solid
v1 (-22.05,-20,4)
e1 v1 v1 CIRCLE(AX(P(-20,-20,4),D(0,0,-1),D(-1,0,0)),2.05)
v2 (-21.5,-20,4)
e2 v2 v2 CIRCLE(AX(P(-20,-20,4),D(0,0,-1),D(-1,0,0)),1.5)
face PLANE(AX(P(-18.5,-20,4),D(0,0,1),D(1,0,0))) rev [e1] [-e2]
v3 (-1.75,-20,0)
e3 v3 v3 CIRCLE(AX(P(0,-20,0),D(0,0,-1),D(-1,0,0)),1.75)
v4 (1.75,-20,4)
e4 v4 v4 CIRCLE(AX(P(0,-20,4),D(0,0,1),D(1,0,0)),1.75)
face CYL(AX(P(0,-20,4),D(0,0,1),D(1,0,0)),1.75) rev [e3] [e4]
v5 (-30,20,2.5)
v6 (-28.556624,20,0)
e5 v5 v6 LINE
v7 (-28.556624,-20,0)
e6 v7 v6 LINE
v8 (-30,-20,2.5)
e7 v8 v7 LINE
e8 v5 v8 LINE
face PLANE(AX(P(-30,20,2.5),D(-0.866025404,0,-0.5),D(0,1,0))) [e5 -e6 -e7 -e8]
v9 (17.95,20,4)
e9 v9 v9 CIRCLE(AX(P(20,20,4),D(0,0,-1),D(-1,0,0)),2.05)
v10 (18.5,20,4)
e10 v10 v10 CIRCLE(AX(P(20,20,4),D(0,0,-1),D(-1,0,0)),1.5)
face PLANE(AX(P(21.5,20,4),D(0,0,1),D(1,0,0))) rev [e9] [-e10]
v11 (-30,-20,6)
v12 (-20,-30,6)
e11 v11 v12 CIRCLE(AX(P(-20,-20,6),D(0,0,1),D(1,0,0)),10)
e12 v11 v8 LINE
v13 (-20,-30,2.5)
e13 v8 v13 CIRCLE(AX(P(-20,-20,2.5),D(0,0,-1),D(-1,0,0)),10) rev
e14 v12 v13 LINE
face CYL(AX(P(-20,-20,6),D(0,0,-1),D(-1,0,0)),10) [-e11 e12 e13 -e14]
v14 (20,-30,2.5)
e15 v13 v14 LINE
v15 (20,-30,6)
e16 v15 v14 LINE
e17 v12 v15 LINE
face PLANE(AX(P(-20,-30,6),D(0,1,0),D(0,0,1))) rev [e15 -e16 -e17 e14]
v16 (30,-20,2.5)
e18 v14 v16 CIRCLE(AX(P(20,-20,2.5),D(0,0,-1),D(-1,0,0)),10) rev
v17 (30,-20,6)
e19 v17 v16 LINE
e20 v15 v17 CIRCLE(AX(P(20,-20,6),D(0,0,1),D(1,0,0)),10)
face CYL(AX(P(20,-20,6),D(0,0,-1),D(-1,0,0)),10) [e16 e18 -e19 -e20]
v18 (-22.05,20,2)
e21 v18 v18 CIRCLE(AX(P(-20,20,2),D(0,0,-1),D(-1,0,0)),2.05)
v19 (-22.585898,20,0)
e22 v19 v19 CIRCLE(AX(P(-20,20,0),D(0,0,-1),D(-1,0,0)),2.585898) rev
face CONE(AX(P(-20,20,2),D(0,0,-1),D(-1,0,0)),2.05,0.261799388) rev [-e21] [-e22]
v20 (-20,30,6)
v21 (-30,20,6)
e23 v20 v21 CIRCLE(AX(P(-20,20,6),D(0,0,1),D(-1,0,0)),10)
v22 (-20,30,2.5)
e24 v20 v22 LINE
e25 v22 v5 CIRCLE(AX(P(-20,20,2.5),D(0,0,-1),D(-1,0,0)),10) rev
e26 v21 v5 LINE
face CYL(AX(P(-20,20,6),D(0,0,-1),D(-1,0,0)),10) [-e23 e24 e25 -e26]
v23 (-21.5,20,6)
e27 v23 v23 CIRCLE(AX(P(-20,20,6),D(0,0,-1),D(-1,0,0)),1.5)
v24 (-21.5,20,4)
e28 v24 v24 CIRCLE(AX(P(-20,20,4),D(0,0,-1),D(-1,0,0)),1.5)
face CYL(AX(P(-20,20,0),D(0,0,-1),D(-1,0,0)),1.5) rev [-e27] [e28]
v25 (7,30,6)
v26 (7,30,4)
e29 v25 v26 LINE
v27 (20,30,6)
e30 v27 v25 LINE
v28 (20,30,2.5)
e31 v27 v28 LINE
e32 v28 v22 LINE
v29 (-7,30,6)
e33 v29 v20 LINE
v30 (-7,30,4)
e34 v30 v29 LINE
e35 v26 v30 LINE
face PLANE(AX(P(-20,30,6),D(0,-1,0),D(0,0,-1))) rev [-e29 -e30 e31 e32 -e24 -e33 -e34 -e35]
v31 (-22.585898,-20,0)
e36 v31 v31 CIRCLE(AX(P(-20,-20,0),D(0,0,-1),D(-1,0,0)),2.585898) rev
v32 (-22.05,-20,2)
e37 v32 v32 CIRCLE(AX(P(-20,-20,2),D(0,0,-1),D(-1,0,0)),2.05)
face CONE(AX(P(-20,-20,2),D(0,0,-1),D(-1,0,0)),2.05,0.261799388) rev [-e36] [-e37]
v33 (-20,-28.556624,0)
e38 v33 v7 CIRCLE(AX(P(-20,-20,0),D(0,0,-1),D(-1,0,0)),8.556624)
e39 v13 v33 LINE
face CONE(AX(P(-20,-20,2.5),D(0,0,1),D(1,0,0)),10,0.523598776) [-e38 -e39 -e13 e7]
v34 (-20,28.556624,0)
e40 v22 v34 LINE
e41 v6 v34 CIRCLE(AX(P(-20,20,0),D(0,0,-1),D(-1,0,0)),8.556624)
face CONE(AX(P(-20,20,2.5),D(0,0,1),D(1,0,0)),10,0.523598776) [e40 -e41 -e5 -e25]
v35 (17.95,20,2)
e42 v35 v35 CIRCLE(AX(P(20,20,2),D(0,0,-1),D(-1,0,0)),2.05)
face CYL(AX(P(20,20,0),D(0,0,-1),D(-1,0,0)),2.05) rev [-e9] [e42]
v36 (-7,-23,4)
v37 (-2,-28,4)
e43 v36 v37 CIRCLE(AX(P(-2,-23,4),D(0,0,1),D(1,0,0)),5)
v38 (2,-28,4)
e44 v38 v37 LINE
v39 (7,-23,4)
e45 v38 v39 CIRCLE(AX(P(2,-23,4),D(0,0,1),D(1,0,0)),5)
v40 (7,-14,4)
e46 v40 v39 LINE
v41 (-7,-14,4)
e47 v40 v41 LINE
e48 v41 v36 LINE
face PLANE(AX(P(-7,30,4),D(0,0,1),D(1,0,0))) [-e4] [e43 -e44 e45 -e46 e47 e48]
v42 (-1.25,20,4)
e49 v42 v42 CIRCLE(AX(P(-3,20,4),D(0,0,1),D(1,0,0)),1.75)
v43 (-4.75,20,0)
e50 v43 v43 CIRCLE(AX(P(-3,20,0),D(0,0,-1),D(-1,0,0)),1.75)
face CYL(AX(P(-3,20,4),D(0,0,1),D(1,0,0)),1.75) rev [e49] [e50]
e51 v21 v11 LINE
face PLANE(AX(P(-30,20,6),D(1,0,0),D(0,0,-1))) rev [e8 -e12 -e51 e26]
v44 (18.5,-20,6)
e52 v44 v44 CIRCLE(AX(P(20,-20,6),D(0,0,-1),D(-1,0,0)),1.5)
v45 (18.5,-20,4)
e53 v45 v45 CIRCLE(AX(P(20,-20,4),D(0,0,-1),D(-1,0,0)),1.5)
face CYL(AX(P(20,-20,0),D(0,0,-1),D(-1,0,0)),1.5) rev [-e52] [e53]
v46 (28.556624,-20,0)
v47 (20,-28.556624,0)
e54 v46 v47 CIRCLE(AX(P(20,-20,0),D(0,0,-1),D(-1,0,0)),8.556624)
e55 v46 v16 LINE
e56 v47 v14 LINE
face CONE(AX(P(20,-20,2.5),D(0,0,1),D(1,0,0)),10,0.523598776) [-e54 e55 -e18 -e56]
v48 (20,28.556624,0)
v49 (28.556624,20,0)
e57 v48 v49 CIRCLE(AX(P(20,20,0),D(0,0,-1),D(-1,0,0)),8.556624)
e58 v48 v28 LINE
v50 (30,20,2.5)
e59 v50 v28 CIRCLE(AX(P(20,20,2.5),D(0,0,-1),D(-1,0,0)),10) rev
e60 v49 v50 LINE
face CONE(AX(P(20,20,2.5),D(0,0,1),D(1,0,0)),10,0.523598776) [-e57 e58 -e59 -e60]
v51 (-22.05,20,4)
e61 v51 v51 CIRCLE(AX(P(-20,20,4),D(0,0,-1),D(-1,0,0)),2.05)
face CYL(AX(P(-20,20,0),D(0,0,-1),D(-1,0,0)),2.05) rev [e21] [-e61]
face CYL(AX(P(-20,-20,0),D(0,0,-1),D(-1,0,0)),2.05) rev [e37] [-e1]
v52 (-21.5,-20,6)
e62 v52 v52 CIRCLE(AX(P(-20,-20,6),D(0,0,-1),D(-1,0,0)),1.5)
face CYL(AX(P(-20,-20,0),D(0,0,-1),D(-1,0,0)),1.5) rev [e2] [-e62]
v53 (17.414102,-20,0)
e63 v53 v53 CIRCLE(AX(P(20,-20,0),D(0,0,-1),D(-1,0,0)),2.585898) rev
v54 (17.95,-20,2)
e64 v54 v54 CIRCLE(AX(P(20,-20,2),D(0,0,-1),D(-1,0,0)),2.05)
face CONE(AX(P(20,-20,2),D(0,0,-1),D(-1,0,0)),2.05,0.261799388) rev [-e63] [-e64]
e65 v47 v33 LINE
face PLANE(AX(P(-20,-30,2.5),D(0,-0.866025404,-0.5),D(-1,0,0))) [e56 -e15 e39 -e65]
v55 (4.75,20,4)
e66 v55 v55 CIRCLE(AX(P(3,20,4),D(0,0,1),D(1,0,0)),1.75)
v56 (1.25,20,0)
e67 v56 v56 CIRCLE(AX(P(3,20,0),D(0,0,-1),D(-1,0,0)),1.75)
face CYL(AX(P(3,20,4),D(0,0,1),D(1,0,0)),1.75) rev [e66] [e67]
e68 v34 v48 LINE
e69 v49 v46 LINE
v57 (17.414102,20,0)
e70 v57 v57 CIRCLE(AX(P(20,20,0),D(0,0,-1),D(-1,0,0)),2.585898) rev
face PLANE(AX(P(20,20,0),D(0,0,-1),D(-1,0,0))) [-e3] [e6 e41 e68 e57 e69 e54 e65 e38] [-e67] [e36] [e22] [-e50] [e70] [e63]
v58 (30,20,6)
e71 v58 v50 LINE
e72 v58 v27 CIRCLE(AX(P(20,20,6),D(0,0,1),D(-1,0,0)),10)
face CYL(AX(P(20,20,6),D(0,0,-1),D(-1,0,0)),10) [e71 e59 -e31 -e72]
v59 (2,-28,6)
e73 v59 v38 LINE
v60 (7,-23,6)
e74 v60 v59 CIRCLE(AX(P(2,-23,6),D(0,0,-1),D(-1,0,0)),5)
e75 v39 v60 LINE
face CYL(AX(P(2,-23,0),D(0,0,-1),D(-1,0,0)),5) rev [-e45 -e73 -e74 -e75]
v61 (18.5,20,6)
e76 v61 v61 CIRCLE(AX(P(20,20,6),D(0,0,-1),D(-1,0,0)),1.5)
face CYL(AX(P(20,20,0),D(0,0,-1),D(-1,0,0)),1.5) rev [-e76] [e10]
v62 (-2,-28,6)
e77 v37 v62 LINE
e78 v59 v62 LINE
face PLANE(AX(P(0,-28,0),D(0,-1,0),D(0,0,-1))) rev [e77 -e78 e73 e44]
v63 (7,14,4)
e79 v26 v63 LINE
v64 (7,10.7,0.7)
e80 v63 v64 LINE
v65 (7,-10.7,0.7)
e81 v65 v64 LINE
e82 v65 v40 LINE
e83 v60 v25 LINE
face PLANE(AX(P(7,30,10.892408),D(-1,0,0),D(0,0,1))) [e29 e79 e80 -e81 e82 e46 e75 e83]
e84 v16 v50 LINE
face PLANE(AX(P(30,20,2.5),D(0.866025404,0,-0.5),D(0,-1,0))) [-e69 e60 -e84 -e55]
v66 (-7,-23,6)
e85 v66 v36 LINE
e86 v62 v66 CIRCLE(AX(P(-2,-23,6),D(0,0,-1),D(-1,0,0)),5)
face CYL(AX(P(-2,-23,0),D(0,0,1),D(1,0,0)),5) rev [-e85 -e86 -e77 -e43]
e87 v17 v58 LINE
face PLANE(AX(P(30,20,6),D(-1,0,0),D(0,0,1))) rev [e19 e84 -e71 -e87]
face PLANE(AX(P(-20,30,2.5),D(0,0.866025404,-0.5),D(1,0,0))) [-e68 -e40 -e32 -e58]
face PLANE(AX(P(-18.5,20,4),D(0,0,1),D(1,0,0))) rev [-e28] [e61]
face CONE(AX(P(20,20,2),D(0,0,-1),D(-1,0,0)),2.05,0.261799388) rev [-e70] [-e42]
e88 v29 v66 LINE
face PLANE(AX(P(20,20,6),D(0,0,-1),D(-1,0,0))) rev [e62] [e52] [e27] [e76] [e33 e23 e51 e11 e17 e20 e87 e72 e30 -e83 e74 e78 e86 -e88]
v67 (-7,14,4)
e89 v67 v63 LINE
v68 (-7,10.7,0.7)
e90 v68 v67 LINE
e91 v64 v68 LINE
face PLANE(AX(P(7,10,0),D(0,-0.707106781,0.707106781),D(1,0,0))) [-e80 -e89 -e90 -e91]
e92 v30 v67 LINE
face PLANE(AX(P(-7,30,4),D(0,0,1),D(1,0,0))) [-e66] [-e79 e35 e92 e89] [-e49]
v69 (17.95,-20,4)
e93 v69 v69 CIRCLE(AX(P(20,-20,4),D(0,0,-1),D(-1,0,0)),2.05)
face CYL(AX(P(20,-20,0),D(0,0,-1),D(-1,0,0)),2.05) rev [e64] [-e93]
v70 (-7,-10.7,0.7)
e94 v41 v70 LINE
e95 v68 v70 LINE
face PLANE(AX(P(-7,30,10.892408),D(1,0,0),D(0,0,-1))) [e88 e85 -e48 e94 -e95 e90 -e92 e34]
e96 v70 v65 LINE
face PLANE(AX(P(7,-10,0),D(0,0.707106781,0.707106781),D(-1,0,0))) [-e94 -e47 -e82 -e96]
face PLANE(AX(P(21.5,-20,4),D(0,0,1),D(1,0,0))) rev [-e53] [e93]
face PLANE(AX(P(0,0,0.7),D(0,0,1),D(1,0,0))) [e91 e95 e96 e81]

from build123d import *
from OCP.BRepFilletAPI import BRepFilletAPI_MakeChamfer

# Parameters (mm, degrees)
BOSS_EXTRUDE1_DEPTH     = 6
CHAMFER1_SIZE           = 2.5
CHAMFER1_SIZE2          = 1.443375673
CUT_EXTRUDE1_DEPTH      = 43.848570571
CUT_EXTRUDE1_DEPTH_BACK = 28
SKETCH2_W               = 14
SKETCH2_H               = 6.892407629
SKETCH3_W               = 14
SKETCH3_H               = 20
CUT_EXTRUDE2_DEPTH      = 3.3
CHAMFER2_SIZE           = 4
HOLE1_D                 = 3
HOLE1_CBORE_D           = 4.1
HOLE1_CBORE_DEPTH       = 4
HOLE2_D                 = 3
HOLE2_CBORE_D           = 3.5
HOLE2_CBORE_DEPTH       = 20
FILLET2_R               = 5
CHAMFER3_SIZE           = 2
CHAMFER3_SIZE2          = 0.535898385


with BuildPart() as part:
    # Sketch1 → Boss-Extrude1 (new body)
    with BuildSketch(Plane.XY):
        with BuildLine():
            Line((-20, 30), (20, 30))
            ThreePointArc((20, 30), (27.071067812, 27.071067812), (30, 20))
            Line((30, 20), (30, -20))
            ThreePointArc((30, -20), (27.071067812, -27.071067812), (20, -30))
            Line((20, -30), (-20, -30))
            ThreePointArc((-20, -30), (-27.071067812, -27.071067812), (-30, -20))
            Line((-30, -20), (-30, 20))
            ThreePointArc((-30, 20), (-27.071067812, 27.071067812), (-20, 30))
        make_face()
    extrude(amount=BOSS_EXTRUDE1_DEPTH)

    # Chamfer1: one chamfer whose edges measure the first distance from different faces: ONE call of the kernel's chamfer builder (chamfer() names one face for all edges)
    chamfer1_edges_1 = [part.edges().sort_by_distance(p)[0] for p in [
        (0, 30, 0),
    ]]
    chamfer1_side_1 = [part.faces().sort_by_distance(p)[0] for p in [
        (0, 30, 3),
    ]]
    chamfer1_edges_2 = [part.edges().sort_by_distance(p)[0] for p in [
        (27.071067812, 27.071067812, 0),
    ]]
    chamfer1_side_2 = [part.faces().sort_by_distance(p)[0] for p in [
        (27.071067812, 27.071067812, 3),
    ]]
    chamfer1_edges_3 = [part.edges().sort_by_distance(p)[0] for p in [
        (30, 0, 0),
    ]]
    chamfer1_side_3 = [part.faces().sort_by_distance(p)[0] for p in [
        (30, 0, 3),
    ]]
    chamfer1_edges_4 = [part.edges().sort_by_distance(p)[0] for p in [
        (27.071067812, -27.071067812, 0),
    ]]
    chamfer1_side_4 = [part.faces().sort_by_distance(p)[0] for p in [
        (27.071067812, -27.071067812, 3),
    ]]
    chamfer1_edges_5 = [part.edges().sort_by_distance(p)[0] for p in [
        (0, -30, 0),
    ]]
    chamfer1_side_5 = [part.faces().sort_by_distance(p)[0] for p in [
        (0, -30, 3),
    ]]
    chamfer1_edges_6 = [part.edges().sort_by_distance(p)[0] for p in [
        (-27.071067812, -27.071067812, 0),
    ]]
    chamfer1_side_6 = [part.faces().sort_by_distance(p)[0] for p in [
        (-27.071067812, -27.071067812, 3),
    ]]
    chamfer1_edges_7 = [part.edges().sort_by_distance(p)[0] for p in [
        (-30, 0, 0),
    ]]
    chamfer1_side_7 = [part.faces().sort_by_distance(p)[0] for p in [
        (-30, 0, 3),
    ]]
    chamfer1_edges_8 = [part.edges().sort_by_distance(p)[0] for p in [
        (-27.071067812, 27.071067812, 0),
    ]]
    chamfer1_side_8 = [part.faces().sort_by_distance(p)[0] for p in [
        (-27.071067812, 27.071067812, 3),
    ]]
    chamfer1 = BRepFilletAPI_MakeChamfer(part.part.solid().wrapped)
    for e in chamfer1_edges_1:
        chamfer1.Add(CHAMFER1_SIZE, CHAMFER1_SIZE2, e.wrapped, chamfer1_side_1[0].wrapped)  # the first distance lies on this face
    for e in chamfer1_edges_2:
        chamfer1.Add(CHAMFER1_SIZE, CHAMFER1_SIZE2, e.wrapped, chamfer1_side_2[0].wrapped)  # the first distance lies on this face
    for e in chamfer1_edges_3:
        chamfer1.Add(CHAMFER1_SIZE, CHAMFER1_SIZE2, e.wrapped, chamfer1_side_3[0].wrapped)  # the first distance lies on this face
    for e in chamfer1_edges_4:
        chamfer1.Add(CHAMFER1_SIZE, CHAMFER1_SIZE2, e.wrapped, chamfer1_side_4[0].wrapped)  # the first distance lies on this face
    for e in chamfer1_edges_5:
        chamfer1.Add(CHAMFER1_SIZE, CHAMFER1_SIZE2, e.wrapped, chamfer1_side_5[0].wrapped)  # the first distance lies on this face
    for e in chamfer1_edges_6:
        chamfer1.Add(CHAMFER1_SIZE, CHAMFER1_SIZE2, e.wrapped, chamfer1_side_6[0].wrapped)  # the first distance lies on this face
    for e in chamfer1_edges_7:
        chamfer1.Add(CHAMFER1_SIZE, CHAMFER1_SIZE2, e.wrapped, chamfer1_side_7[0].wrapped)  # the first distance lies on this face
    for e in chamfer1_edges_8:
        chamfer1.Add(CHAMFER1_SIZE, CHAMFER1_SIZE2, e.wrapped, chamfer1_side_8[0].wrapped)  # the first distance lies on this face
    add(Compound.cast(chamfer1.Shape()), mode=Mode.REPLACE)

    # Sketch2 → Cut-Extrude1 (cut, two sides: drawn at the far end of the back side and taken through both)
    with BuildSketch(Plane(origin=(0, 0, 0), x_dir=(1, 0, 0), z_dir=(0, 1, 0)).offset(-CUT_EXTRUDE1_DEPTH_BACK)):
        with Locations((0, -7.446203815)):
            Rectangle(SKETCH2_W, SKETCH2_H)
    extrude(amount=CUT_EXTRUDE1_DEPTH + CUT_EXTRUDE1_DEPTH_BACK, mode=Mode.SUBTRACT)

    # Sketch3 → Cut-Extrude2 (cut)
    with BuildSketch(Plane.XY.offset(4)):
        Rectangle(SKETCH3_W, SKETCH3_H)
    extrude(amount=-CUT_EXTRUDE2_DEPTH, mode=Mode.SUBTRACT)

    # Chamfer2
    # the kernel refuses this chamfer: 4 mm, written as the material it takes off along each edge
    with BuildSketch(Plane(origin=(-7, 10, 4), x_dir=(0, 0.9996219169112968, 0.02749587661058627), z_dir=(1, 0, 0))) as chamfer2_piece_1_section:
        Polygon((CHAMFER2_SIZE * 0.999621916911, -CHAMFER2_SIZE * 0.0274958766106), (-CHAMFER2_SIZE * 0.0274958766106, -CHAMFER2_SIZE * 0.999621916911), (0, 0), align=None)
    chamfer2_piece_1 = extrude(amount=14, mode=Mode.PRIVATE)
    chamfer2_piece_1 = split(chamfer2_piece_1, bisect_by=Plane(origin=(0, 11.371649583, 0.7), z_dir=(0, 0, 1)), keep=Keep.TOP, mode=Mode.PRIVATE)
    add(chamfer2_piece_1, mode=Mode.SUBTRACT)
    with BuildSketch(Plane(origin=(7, -10, 4), x_dir=(0, -0.9996219169112968, 0.02749587661058627), z_dir=(-1, 0, 0))) as chamfer2_piece_2_section:
        Polygon((CHAMFER2_SIZE * 0.999621916911, -CHAMFER2_SIZE * 0.0274958766106), (-CHAMFER2_SIZE * 0.0274958766106, -CHAMFER2_SIZE * 0.999621916911), (0, 0), align=None)
    chamfer2_piece_2 = extrude(amount=14, mode=Mode.PRIVATE)
    chamfer2_piece_2 = split(chamfer2_piece_2, bisect_by=Plane(origin=(0, -11.371649583, 0.7), z_dir=(0, 0, 1)), keep=Keep.TOP, mode=Mode.PRIVATE)
    add(chamfer2_piece_2, mode=Mode.SUBTRACT)

    # Hole1 (through all)
    with Locations(Plane(origin=(0, 0, 0), x_dir=(-1, 0, 0), z_dir=(0, 0, -1))):
        with Locations((20, -20), (-20, -20), (-20, 20), (20, 20)):
            CounterBoreHole(HOLE1_D / 2, HOLE1_CBORE_D / 2, HOLE1_CBORE_DEPTH)

    # Hole2 (through all)
    with Locations(Plane.XY.offset(4)):
        with Locations((3, 20), (-3, 20), (0, -20)):
            CounterBoreHole(HOLE2_D / 2, HOLE2_CBORE_D / 2, HOLE2_CBORE_DEPTH)

    # Fillet2
    fillet2_edges = [part.edges().sort_by_distance(p)[0] for p in [
        (-7, -28, 5),
        (7, -28, 5),
    ]]
    fillet(fillet2_edges, radius=FILLET2_R)

    # Chamfer3: one chamfer whose edges measure the first distance from different faces: ONE call of the kernel's chamfer builder (chamfer() names one face for all edges)
    chamfer3_edges_1 = [part.edges().sort_by_distance(p)[0] for p in [
        (22.05, 20, 0),
    ]]
    chamfer3_side_1 = [part.faces().sort_by_distance(p)[0] for p in [
        (22.05, 20, 2),
    ]]
    chamfer3_edges_2 = [part.edges().sort_by_distance(p)[0] for p in [
        (22.05, -20, 0),
    ]]
    chamfer3_side_2 = [part.faces().sort_by_distance(p)[0] for p in [
        (22.05, -20, 2),
    ]]
    chamfer3_edges_3 = [part.edges().sort_by_distance(p)[0] for p in [
        (-17.95, -20, 0),
    ]]
    chamfer3_side_3 = [part.faces().sort_by_distance(p)[0] for p in [
        (-17.95, -20, 2),
    ]]
    chamfer3_edges_4 = [part.edges().sort_by_distance(p)[0] for p in [
        (-17.95, 20, 0),
    ]]
    chamfer3_side_4 = [part.faces().sort_by_distance(p)[0] for p in [
        (-17.95, 20, 2),
    ]]
    chamfer3 = BRepFilletAPI_MakeChamfer(part.part.solid().wrapped)
    for e in chamfer3_edges_1:
        chamfer3.Add(CHAMFER3_SIZE, CHAMFER3_SIZE2, e.wrapped, chamfer3_side_1[0].wrapped)  # the first distance lies on this face
    for e in chamfer3_edges_2:
        chamfer3.Add(CHAMFER3_SIZE, CHAMFER3_SIZE2, e.wrapped, chamfer3_side_2[0].wrapped)  # the first distance lies on this face
    for e in chamfer3_edges_3:
        chamfer3.Add(CHAMFER3_SIZE, CHAMFER3_SIZE2, e.wrapped, chamfer3_side_3[0].wrapped)  # the first distance lies on this face
    for e in chamfer3_edges_4:
        chamfer3.Add(CHAMFER3_SIZE, CHAMFER3_SIZE2, e.wrapped, chamfer3_side_4[0].wrapped)  # the first distance lies on this face
    add(Compound.cast(chamfer3.Shape()), mode=Mode.REPLACE)


solid = part.part
